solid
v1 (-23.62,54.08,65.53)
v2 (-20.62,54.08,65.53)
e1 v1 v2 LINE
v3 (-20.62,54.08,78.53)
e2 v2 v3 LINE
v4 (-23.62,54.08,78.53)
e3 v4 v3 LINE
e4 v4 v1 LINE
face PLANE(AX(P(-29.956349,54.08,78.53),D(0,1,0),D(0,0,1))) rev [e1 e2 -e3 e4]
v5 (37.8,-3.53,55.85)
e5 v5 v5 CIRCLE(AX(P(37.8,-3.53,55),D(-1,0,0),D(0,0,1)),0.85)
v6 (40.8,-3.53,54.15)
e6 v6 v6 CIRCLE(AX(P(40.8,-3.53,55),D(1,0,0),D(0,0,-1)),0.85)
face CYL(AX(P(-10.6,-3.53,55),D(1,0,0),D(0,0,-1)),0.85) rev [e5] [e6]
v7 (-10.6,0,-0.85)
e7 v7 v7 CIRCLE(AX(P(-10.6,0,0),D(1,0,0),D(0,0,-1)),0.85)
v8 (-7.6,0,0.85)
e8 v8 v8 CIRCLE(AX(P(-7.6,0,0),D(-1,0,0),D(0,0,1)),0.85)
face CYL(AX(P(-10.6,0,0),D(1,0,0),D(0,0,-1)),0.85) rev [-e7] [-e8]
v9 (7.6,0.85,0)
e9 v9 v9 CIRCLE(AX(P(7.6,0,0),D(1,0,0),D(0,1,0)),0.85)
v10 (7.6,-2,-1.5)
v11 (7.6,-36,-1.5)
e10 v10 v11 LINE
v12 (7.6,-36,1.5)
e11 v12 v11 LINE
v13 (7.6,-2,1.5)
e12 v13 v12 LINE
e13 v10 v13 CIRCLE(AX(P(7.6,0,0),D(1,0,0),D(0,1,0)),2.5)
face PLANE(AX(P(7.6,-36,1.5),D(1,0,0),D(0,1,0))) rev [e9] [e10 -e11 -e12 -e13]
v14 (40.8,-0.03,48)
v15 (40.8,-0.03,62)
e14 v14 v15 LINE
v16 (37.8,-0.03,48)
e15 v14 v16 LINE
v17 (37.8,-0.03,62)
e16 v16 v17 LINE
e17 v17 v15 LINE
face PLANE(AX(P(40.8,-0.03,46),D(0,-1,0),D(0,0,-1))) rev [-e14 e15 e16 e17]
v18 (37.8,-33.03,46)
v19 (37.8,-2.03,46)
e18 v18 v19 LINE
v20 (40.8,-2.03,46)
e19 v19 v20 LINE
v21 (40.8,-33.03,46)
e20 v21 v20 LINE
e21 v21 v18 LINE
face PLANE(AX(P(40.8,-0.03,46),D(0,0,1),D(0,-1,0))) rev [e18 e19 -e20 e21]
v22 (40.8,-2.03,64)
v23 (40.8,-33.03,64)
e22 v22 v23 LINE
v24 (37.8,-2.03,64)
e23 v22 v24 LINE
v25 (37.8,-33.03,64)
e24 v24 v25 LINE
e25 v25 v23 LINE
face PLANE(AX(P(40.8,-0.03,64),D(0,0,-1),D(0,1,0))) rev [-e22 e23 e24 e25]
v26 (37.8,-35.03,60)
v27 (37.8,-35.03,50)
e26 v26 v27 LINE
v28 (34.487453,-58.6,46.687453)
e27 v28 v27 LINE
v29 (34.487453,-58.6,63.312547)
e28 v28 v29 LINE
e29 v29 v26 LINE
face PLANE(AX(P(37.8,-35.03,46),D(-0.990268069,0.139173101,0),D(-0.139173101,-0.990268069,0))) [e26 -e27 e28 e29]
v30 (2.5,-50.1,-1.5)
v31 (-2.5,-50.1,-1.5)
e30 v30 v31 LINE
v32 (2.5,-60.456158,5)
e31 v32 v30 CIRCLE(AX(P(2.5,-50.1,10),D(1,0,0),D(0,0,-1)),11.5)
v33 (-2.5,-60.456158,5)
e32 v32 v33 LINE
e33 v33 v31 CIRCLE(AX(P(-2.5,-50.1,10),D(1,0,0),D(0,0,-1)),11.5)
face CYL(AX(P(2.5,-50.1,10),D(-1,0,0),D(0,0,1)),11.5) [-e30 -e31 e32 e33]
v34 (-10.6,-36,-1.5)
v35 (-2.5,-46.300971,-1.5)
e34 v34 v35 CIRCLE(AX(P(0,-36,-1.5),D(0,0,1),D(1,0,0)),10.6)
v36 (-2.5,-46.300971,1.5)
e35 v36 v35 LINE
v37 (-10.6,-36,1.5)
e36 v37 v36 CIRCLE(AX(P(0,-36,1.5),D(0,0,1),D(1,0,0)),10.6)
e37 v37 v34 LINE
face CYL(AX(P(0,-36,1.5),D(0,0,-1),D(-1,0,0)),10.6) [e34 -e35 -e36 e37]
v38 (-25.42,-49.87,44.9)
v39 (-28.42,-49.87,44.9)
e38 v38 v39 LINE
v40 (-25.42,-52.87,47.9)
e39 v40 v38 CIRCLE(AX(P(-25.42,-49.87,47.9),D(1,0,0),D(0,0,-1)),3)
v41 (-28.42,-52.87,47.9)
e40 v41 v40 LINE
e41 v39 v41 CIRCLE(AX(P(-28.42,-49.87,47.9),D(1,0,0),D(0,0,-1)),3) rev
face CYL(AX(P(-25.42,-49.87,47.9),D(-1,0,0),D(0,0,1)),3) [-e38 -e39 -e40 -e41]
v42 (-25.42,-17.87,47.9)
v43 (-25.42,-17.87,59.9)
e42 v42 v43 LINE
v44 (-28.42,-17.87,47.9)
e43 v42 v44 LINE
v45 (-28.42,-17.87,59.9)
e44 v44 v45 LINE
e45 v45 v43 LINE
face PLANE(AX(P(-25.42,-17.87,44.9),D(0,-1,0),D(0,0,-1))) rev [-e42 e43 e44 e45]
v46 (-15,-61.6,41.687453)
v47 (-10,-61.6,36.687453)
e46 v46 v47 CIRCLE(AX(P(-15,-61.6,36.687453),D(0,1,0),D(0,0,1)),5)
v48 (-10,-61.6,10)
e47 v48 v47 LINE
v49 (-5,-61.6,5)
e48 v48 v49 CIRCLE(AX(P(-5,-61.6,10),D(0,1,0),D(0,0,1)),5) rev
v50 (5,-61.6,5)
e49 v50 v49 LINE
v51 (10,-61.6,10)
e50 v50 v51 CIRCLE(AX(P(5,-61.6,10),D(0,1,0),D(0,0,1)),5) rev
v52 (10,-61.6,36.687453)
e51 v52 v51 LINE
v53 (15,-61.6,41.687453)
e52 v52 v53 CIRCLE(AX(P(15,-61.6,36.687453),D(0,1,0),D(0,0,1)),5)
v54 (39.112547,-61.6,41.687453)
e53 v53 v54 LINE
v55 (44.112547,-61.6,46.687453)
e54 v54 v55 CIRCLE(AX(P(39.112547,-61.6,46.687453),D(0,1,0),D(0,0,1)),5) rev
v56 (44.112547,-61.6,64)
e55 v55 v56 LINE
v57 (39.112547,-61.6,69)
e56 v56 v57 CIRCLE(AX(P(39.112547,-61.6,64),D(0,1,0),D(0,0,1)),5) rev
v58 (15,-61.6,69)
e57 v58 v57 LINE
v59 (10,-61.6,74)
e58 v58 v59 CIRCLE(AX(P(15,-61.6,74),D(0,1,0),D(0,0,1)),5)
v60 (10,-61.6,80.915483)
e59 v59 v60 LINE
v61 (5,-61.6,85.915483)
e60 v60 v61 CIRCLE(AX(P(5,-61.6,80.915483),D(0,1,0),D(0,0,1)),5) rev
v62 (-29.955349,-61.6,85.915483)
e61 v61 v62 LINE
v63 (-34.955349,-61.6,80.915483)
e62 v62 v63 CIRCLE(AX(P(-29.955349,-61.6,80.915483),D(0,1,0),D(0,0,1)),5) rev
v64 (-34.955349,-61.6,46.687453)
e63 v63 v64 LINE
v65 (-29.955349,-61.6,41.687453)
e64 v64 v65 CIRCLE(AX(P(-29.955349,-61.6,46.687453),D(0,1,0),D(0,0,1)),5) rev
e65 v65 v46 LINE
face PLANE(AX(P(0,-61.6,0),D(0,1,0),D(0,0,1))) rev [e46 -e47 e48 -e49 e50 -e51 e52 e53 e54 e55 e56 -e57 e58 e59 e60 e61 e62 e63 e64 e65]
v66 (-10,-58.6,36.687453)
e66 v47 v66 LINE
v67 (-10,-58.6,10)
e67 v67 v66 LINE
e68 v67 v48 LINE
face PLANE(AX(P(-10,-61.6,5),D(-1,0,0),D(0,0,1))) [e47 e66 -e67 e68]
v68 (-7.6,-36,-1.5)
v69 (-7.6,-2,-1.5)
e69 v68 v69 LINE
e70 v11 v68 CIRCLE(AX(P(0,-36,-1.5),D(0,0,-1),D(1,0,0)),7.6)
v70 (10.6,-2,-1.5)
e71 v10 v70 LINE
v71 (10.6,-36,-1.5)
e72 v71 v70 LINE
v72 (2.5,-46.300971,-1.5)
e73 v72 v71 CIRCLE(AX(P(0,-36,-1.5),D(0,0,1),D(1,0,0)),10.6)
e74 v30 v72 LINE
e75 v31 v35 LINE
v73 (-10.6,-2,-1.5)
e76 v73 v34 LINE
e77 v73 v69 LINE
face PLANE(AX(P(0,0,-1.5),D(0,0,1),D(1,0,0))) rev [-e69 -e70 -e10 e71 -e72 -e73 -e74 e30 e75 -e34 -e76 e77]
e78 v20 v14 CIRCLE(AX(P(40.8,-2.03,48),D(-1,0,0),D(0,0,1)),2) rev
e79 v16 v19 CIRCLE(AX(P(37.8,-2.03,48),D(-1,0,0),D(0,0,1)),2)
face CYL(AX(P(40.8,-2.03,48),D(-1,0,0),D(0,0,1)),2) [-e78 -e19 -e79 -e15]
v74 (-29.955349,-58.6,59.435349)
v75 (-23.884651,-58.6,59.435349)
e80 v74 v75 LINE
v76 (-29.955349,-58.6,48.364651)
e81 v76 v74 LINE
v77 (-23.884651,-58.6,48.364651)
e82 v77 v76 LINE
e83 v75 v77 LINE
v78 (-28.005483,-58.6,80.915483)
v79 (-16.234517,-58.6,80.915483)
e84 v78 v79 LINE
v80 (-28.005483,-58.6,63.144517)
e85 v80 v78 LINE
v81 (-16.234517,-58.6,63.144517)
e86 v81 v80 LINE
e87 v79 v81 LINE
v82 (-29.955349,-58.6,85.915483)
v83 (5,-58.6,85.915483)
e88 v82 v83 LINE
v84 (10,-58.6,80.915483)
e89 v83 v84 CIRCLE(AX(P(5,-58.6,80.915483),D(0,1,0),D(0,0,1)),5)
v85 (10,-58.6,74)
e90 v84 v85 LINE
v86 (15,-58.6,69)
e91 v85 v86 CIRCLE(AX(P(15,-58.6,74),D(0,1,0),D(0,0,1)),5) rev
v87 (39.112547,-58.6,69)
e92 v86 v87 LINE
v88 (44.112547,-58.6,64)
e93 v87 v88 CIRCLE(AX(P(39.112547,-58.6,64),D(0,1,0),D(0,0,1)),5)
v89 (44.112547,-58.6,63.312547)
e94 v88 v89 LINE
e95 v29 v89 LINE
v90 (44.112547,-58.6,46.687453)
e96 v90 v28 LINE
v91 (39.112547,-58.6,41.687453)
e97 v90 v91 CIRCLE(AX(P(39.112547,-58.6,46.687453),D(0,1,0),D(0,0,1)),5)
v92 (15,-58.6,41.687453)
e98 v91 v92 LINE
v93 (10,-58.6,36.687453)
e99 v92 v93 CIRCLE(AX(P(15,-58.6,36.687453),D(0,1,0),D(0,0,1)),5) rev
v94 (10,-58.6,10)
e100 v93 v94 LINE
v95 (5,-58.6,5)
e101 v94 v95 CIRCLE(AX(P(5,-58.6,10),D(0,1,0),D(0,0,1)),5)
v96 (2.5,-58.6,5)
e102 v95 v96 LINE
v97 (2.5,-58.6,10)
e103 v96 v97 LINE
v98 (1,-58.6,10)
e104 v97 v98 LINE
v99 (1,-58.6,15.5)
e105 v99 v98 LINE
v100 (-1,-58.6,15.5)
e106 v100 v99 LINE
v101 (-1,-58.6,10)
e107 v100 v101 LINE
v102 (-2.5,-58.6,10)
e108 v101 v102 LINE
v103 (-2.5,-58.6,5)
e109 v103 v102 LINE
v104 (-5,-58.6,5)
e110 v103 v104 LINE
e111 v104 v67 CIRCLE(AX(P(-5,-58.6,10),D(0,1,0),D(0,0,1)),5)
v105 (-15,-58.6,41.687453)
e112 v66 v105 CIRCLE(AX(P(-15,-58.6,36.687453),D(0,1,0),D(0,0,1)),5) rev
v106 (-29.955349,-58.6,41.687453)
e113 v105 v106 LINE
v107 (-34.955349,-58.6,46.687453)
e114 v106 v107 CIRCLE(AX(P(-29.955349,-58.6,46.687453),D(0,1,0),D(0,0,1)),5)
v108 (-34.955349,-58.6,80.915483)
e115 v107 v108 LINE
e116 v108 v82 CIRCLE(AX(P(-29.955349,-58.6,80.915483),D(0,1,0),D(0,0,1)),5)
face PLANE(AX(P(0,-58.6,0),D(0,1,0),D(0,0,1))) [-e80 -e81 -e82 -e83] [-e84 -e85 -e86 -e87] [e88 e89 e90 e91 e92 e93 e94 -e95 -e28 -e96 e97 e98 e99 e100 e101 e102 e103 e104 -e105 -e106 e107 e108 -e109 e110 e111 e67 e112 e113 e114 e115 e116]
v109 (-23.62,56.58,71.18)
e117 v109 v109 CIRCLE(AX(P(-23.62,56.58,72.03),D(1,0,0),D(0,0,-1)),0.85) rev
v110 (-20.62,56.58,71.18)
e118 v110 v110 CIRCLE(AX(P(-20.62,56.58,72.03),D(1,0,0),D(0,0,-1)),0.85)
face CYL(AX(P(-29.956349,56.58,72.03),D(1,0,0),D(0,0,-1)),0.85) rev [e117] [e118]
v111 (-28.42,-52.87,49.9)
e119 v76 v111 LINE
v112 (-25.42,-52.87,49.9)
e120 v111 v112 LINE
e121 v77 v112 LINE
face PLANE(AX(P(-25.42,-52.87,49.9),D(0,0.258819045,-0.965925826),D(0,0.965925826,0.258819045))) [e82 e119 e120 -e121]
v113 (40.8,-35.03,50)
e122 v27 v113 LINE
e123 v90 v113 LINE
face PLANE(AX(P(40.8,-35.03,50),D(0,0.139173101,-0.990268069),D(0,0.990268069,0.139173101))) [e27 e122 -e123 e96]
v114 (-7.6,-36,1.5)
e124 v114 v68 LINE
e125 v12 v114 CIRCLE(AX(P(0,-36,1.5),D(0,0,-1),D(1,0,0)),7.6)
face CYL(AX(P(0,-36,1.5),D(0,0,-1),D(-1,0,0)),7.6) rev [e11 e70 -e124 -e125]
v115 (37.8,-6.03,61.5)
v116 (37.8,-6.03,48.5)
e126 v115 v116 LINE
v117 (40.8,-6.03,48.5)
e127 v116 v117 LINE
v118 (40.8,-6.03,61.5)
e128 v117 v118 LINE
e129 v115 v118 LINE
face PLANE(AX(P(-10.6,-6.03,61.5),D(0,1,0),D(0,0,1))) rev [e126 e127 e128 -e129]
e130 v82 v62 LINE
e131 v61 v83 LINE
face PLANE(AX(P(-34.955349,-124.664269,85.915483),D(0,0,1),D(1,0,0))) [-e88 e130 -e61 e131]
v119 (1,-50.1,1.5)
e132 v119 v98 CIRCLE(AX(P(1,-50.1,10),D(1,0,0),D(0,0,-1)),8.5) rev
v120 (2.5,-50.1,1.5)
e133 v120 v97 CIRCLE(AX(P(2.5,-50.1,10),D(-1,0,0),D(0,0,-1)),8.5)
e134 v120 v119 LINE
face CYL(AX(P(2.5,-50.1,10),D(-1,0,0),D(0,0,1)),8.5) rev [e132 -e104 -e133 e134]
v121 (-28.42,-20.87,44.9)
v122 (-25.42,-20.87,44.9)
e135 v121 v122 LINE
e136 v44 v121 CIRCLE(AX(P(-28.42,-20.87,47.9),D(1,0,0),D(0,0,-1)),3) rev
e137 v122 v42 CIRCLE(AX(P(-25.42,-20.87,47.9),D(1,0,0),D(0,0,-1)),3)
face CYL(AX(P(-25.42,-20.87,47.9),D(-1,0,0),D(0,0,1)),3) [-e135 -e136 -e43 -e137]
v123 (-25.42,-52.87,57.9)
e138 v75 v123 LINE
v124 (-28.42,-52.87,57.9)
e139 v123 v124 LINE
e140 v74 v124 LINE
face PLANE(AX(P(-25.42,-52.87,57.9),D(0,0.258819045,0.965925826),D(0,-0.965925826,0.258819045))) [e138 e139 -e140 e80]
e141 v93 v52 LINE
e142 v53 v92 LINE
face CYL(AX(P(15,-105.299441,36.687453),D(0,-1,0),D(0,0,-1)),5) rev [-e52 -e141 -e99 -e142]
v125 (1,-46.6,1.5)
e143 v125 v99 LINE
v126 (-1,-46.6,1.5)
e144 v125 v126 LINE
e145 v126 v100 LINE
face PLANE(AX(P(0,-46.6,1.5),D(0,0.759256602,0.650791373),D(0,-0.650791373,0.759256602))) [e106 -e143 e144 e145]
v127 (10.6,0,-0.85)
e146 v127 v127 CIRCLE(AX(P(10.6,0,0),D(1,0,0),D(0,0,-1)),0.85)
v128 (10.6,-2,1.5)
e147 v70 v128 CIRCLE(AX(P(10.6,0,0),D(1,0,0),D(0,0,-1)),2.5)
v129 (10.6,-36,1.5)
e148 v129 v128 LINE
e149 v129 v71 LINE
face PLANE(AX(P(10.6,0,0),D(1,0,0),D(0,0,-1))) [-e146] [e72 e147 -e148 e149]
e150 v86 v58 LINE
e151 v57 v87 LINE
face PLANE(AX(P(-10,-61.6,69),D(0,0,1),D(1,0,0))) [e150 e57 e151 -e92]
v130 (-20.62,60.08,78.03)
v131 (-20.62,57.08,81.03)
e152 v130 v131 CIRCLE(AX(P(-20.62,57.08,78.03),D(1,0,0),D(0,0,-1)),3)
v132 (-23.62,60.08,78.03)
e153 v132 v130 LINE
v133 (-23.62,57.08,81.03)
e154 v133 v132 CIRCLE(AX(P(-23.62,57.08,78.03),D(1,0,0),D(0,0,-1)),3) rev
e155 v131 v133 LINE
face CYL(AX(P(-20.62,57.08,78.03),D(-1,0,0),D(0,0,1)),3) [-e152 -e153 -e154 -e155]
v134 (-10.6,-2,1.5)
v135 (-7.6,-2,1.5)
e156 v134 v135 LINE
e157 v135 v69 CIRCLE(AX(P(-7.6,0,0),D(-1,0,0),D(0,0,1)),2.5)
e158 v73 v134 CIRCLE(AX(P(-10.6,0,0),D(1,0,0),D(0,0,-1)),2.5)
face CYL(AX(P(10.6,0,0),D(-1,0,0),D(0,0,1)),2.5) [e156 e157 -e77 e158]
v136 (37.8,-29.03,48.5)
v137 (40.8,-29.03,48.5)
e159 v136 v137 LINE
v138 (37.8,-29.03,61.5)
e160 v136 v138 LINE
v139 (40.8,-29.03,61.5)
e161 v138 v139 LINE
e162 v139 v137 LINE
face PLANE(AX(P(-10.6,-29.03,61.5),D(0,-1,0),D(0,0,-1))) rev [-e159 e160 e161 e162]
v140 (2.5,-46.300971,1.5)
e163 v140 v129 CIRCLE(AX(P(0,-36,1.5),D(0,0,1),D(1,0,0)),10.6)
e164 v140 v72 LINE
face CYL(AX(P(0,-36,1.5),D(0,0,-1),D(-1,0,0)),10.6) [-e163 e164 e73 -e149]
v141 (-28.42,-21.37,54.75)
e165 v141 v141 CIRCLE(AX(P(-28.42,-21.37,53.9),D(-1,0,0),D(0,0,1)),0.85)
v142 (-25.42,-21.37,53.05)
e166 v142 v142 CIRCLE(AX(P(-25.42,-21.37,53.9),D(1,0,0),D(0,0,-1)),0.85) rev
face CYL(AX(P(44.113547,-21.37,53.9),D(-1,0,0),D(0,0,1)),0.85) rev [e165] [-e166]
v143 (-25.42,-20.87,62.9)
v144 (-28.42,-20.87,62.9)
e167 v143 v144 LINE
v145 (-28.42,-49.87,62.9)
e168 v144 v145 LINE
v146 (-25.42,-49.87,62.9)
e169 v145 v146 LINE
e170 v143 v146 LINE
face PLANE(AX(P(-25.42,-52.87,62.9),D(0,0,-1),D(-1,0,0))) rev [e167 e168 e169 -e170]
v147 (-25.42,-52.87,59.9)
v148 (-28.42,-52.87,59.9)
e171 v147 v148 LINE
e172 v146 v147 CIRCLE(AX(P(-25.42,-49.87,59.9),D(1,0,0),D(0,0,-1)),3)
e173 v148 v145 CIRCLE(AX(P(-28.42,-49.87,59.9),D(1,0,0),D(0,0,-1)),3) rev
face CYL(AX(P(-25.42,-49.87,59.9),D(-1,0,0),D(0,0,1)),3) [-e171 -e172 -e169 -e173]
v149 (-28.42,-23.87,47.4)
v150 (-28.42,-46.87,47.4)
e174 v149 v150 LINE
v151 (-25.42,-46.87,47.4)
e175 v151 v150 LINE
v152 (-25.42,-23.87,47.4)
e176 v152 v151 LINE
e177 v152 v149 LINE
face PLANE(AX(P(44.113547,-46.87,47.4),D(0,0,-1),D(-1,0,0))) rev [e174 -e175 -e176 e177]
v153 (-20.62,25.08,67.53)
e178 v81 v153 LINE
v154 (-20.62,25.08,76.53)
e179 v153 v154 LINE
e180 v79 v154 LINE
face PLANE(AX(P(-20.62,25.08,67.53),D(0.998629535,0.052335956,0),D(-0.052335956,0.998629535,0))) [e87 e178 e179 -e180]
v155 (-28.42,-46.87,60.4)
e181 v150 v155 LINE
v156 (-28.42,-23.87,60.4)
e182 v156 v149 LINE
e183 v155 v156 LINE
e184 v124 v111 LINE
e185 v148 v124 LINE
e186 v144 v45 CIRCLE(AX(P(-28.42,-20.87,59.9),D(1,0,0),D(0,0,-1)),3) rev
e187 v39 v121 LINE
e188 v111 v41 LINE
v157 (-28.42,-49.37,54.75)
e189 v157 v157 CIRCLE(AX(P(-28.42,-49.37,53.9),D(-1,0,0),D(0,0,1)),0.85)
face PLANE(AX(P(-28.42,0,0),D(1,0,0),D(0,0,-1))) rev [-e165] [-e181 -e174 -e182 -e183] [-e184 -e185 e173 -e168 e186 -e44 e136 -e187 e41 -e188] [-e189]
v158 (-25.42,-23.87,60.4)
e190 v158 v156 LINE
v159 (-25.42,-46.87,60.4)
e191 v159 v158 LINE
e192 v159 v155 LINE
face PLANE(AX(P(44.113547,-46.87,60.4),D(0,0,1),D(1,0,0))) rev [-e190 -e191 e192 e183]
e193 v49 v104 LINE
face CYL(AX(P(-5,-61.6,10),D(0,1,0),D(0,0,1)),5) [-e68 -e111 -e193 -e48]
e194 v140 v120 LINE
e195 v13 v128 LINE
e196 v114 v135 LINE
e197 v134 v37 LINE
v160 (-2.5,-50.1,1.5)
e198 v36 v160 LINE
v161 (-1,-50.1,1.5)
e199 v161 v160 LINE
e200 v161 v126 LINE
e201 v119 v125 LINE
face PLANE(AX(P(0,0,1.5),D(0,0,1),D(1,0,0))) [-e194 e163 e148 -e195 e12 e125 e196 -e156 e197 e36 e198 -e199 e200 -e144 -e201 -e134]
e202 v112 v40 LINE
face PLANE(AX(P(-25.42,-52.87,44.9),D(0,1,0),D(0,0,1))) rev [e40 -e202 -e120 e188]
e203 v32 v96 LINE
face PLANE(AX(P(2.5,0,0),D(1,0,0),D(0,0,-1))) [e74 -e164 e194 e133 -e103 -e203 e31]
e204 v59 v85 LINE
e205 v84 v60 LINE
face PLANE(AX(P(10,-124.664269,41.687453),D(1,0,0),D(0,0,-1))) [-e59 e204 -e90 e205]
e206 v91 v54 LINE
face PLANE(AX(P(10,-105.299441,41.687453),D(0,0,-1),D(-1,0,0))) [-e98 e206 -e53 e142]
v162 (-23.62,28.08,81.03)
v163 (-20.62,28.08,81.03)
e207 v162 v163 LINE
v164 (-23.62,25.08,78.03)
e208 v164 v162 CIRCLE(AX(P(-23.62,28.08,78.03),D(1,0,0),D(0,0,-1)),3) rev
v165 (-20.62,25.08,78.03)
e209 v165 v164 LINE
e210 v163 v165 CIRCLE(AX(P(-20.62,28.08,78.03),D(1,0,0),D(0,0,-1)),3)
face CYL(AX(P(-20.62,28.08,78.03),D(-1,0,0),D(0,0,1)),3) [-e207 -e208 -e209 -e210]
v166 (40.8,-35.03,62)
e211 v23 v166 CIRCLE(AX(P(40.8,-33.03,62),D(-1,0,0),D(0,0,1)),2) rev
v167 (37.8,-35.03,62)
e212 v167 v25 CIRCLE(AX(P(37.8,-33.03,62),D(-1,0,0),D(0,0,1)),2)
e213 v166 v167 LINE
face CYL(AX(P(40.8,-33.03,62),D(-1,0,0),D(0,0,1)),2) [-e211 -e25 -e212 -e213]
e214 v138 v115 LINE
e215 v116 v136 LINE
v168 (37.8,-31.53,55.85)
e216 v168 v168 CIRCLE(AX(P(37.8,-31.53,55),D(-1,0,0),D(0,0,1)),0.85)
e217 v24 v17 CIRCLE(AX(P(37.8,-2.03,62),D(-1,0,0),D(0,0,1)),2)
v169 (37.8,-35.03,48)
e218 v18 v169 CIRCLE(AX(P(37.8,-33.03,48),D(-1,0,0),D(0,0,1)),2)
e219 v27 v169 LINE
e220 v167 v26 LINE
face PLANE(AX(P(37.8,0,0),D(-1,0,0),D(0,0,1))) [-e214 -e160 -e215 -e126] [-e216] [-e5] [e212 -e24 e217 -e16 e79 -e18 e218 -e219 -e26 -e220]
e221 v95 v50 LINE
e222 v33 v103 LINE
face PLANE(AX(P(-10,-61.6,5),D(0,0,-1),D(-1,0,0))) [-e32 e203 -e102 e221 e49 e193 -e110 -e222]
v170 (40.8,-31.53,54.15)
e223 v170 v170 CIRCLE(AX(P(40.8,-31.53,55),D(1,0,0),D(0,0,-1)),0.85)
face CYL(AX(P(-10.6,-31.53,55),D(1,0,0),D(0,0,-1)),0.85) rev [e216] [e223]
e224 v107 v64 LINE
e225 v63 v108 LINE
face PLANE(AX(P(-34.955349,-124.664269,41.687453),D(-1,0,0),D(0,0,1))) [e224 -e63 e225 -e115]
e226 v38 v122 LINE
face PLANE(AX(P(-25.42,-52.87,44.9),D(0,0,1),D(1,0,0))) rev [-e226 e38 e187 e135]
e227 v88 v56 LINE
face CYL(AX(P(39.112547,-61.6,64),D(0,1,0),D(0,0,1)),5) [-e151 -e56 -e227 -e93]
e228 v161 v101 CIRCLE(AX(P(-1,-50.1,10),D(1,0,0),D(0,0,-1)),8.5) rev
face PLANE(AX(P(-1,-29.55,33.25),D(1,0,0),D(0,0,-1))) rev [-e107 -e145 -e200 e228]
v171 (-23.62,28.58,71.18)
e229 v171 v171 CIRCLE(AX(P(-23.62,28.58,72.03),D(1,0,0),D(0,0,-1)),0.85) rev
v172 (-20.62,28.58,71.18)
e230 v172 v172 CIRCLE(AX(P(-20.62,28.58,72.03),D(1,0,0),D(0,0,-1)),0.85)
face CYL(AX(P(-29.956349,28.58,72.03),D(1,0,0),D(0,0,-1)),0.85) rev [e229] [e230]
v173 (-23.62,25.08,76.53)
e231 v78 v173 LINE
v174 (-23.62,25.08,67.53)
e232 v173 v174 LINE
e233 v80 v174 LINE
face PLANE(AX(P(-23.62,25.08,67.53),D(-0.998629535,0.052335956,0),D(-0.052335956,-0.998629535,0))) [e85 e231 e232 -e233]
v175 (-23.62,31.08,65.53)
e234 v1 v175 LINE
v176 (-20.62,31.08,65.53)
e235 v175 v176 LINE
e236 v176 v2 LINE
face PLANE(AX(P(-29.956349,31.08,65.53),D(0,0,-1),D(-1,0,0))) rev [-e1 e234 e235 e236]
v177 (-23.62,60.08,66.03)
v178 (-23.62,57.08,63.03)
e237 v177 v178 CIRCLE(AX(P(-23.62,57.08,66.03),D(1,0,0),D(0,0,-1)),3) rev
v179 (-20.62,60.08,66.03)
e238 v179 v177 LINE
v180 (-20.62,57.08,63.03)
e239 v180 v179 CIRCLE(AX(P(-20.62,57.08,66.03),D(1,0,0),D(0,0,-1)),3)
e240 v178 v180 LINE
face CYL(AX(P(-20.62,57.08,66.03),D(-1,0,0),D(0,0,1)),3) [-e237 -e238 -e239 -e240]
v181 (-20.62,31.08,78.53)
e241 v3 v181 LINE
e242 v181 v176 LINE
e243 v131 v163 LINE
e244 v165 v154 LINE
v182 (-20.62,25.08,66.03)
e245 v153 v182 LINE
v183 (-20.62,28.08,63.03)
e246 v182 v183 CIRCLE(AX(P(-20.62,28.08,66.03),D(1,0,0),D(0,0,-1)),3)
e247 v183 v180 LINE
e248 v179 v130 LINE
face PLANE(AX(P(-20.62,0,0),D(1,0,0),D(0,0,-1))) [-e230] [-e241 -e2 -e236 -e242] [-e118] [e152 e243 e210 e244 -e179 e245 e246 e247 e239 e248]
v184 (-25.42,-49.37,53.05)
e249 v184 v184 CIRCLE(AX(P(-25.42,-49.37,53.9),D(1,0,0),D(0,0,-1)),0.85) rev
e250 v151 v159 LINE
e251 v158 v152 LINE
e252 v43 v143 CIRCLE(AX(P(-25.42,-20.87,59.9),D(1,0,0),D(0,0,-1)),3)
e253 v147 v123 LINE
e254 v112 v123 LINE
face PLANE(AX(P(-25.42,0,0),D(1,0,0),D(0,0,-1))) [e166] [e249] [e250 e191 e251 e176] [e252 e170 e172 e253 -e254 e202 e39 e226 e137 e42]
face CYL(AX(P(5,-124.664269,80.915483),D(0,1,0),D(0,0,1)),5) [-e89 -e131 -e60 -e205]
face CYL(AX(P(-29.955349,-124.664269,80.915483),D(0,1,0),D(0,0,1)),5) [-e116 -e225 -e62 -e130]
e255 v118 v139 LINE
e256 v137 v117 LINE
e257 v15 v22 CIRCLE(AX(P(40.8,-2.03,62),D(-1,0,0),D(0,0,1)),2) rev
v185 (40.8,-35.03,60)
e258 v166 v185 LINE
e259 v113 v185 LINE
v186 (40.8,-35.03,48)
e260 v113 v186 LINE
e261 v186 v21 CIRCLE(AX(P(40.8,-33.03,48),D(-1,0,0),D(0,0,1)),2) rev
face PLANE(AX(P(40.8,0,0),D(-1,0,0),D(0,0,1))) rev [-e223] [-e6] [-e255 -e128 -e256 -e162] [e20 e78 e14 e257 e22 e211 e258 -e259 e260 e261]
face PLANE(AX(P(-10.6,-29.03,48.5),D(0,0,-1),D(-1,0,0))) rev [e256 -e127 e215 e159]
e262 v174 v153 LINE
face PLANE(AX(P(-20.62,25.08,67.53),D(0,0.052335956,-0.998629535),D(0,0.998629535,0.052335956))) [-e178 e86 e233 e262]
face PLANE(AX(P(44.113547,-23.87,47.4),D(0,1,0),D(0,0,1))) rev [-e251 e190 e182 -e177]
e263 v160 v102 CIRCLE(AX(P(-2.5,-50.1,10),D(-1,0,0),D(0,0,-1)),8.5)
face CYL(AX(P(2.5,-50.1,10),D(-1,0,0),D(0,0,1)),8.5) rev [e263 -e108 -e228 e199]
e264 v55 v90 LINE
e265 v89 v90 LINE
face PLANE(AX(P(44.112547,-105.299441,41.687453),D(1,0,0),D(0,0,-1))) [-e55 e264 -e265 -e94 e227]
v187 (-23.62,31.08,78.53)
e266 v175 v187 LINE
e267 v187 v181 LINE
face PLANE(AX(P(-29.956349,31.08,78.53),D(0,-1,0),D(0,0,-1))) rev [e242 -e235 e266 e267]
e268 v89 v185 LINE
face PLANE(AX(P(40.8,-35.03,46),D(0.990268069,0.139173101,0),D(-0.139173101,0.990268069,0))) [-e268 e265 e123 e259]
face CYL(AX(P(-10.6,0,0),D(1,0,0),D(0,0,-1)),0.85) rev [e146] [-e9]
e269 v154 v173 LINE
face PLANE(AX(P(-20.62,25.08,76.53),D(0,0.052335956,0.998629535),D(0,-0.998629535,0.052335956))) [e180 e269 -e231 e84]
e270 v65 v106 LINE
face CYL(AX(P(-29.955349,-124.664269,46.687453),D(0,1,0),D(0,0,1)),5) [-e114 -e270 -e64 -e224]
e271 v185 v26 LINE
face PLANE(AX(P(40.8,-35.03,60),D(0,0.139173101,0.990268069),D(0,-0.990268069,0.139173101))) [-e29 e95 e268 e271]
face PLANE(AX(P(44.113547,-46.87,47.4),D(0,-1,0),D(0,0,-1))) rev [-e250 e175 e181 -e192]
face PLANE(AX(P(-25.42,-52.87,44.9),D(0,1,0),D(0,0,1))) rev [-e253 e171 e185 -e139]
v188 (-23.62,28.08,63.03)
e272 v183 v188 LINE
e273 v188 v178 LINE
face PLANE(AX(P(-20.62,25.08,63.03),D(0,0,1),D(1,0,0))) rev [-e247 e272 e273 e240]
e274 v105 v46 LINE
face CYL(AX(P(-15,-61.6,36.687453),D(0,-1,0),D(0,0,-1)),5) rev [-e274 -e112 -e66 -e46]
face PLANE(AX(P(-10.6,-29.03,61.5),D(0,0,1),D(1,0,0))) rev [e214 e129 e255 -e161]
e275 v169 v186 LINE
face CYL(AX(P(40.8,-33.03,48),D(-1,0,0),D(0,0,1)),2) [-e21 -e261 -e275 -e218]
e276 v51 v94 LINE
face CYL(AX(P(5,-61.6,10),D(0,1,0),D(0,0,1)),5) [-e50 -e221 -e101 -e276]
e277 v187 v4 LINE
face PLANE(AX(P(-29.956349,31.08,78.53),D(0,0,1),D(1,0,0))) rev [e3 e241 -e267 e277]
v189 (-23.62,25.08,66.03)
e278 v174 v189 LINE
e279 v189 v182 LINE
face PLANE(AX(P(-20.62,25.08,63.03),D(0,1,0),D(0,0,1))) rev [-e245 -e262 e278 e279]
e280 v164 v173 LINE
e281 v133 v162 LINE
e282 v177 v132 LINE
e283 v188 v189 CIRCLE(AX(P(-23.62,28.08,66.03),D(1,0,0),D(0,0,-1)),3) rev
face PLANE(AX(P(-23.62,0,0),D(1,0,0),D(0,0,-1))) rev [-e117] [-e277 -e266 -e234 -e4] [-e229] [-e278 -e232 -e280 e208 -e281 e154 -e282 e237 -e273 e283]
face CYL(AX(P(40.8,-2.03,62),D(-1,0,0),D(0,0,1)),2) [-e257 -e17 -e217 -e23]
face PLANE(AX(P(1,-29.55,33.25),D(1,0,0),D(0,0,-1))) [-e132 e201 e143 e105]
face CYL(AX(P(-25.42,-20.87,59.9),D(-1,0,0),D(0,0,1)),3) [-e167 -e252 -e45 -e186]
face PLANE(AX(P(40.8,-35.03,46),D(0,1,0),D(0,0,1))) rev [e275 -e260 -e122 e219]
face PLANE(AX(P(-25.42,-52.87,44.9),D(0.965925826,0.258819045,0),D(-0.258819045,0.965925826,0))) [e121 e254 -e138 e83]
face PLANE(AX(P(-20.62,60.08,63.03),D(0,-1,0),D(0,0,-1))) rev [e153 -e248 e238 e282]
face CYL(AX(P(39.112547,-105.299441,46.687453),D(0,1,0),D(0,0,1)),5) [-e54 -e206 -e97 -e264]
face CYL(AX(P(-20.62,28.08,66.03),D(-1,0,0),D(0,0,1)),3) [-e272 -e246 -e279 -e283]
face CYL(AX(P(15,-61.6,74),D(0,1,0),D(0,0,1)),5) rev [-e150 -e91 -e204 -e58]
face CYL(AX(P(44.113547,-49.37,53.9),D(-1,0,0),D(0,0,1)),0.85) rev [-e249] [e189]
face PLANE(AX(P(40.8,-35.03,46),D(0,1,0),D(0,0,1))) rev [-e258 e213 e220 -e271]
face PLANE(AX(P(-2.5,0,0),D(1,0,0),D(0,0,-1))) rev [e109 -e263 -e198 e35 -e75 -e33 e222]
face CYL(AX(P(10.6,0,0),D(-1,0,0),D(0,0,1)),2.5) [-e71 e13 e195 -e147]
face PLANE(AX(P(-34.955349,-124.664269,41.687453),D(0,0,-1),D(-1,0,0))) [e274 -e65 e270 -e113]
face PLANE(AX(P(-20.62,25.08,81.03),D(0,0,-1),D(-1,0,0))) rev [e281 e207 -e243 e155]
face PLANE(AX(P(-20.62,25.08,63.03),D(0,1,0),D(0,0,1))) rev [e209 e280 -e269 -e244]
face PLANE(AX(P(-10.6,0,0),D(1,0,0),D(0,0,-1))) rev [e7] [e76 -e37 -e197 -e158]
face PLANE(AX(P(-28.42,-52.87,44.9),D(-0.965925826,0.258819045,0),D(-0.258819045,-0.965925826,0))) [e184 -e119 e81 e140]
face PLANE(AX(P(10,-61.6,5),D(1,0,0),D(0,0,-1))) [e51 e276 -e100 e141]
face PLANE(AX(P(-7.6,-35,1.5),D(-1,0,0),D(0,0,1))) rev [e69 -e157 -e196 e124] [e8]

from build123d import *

# Parameters (mm, degrees)
ESBO_O1_R                     = 2.5
RESSALTO_EXTRUS_O1_DEPTH      = 10.6
ESBO_O8_W                     = 21.2
ESBO_O8_H                     = 35
RESSALTO_EXTRUS_O6_DEPTH      = 1.5
RESSALTO_EXTRUS_O2_DEPTH      = 1.5
CORTE_EXTRUS_O1_DEPTH         = 48.855720661
CORTE_EXTRUS_O1_DEPTH_BACK    = 48.855720661
ESBO_O3_W                     = 15.2
ESBO_O3_H                     = 37.5
CORTE_EXTRUS_O2_DEPTH         = 48.855720661
CORTE_EXTRUS_O2_DEPTH_BACK    = 48.855720661
ESBO_O4_R                     = 0.85
ESBO_O5_W                     = 3
ESBO_O5_H                     = 5
RESSALTO_EXTRUS_O3_DEPTH      = 2.5
RESSALTO_EXTRUS_O4_DEPTH      = 2.5
RESSALTO_EXTRUS_O5_START      = -58.6
ESBO_O7_W                     = 20
ESBO_O7_H                     = 64
RESSALTO_EXTRUS_O5_DEPTH      = 3
NERVURA2_REACH                = 95.102
ESBO_O10_WALL_W               = 206.642418638
ESBO_O10_WALL_H               = 2
ESBO_O11_W                    = 18
ESBO_O11_H                    = 35
RESSALTO_EXTRUS_O7_DEPTH      = 3
ESBO_O12_W                    = 13
ESBO_O12_H                    = 23
CORTE_EXTRUS_O3_DEPTH         = 106.818334895
ESBO_O13_R                    = 0.85
CORTE_EXTRUS_O4_DEPTH         = 106.818334895
FILETE1_R                     = 2
RESSALTO_EXTRUS_O11_OUTLINE_W = 9.625094948
RESSALTO_EXTRUS_O11_OUTLINE_H = 16.625094948
RESSALTO_EXTRUS_O11_DEPTH     = 23.57
RESSALTO_EXTRUS_O11_TAPER     = 8
RESSALTO_EXTRUS_O9_START      = -28.42
ESBO_O19_W                    = 18
ESBO_O19_H                    = 35
RESSALTO_EXTRUS_O9_DEPTH      = 3
ESBO_O20_W                    = 13
ESBO_O20_H                    = 23
CORTE_EXTRUS_O6_DEPTH         = 3
ESBO_O21_R                    = 0.85
CORTE_EXTRUS_O7_DEPTH         = 3
FILETE2_R                     = 3
RESSALTO_EXTRUS_O10_OUTLINE_W = 6.070697746
RESSALTO_EXTRUS_O10_OUTLINE_H = 11.070697746
RESSALTO_EXTRUS_O10_DEPTH     = 5.73
RESSALTO_EXTRUS_O10_TAPER     = 15
RESSALTO_EXTRUS_O13_START     = -23.62
ESBO_O28_W                    = 18
ESBO_O28_H                    = 35
RESSALTO_EXTRUS_O13_DEPTH     = 3
ESBO_O29_W                    = 13
ESBO_O29_H                    = 23
CORTE_EXTRUS_O8_DEPTH         = 3
ESBO_O30_R                    = 0.85
CORTE_EXTRUS_O9_DEPTH         = 3
FILETE4_R                     = 3
RESSALTO_EXTRUS_O14_OUTLINE_W = 11.77096594
RESSALTO_EXTRUS_O14_OUTLINE_H = 17.77096594
RESSALTO_EXTRUS_O14_DEPTH     = 83.68
RESSALTO_EXTRUS_O14_DRAFT     = -3
ESBO_O25_W                    = 34.112547474
ESBO_O25_H                    = 27.312547474
RESSALTO_EXTRUS_O12_DEPTH     = 3
ESBO_O32_W                    = 44.955348873
ESBO_O32_H                    = 44.228030444
RESSALTO_EXTRUS_O15_DEPTH     = 3
FILETE3_R                     = 5


# Read off the part's stored shape, not the designer's step: Ressalto-extrusão11, Ressalto-extrusão10, Ressalto-extrusão14
with BuildPart() as part:
    # Esboço1 → Ressalto-extrusão1 (new, symmetric)
    with BuildSketch(Plane(origin=(0, 0, 0), x_dir=(0, 0, -1), z_dir=(1, 0, 0))):
        Circle(ESBO_O1_R)
    extrude(amount=RESSALTO_EXTRUS_O1_DEPTH, both=True)

    # Esboço8 → Ressalto-extrusão6 (add, symmetric)
    with BuildSketch(Plane.XY):
        with Locations((0, -17.5)):
            Rectangle(ESBO_O8_W, ESBO_O8_H)
    extrude(amount=RESSALTO_EXTRUS_O6_DEPTH, both=True)

    # Esboço2 → Ressalto-extrusão2 (add, symmetric)
    with BuildSketch(Plane.XY):
        with BuildLine():
            Line((-10.6, -36), (-10.6, -35))
            Line((-10.6, -35), (-7.6, -35))
            Line((-7.6, -35), (-7.6, -36))
            ThreePointArc((-7.6, -36), (0, -43.6), (7.6, -36))
            Line((7.6, -36), (7.6, -35))
            Line((7.6, -35), (10.6, -35))
            Line((10.6, -35), (10.6, -36))
            ThreePointArc((10.6, -36), (0, -46.6), (-10.6, -36))
        make_face()
    extrude(amount=RESSALTO_EXTRUS_O2_DEPTH, both=True)

    # Esboço3 → Corte-extrusão1 (cut, two sides: drawn at the far end of the back side and taken through both)
    with BuildSketch(Plane.XY.offset(-CORTE_EXTRUS_O1_DEPTH_BACK)):
        with Locations((0, -16.25)):
            Rectangle(ESBO_O3_W, ESBO_O3_H)
    extrude(amount=CORTE_EXTRUS_O1_DEPTH + CORTE_EXTRUS_O1_DEPTH_BACK, mode=Mode.SUBTRACT)

    # Esboço4 → Corte-extrusão2 (cut, two sides: drawn at the far end of the back side and taken through both)
    with BuildSketch(Plane(origin=(0, 0, 0), x_dir=(0, 0, -1), z_dir=(1, 0, 0)).offset(-CORTE_EXTRUS_O2_DEPTH_BACK)):
        Circle(ESBO_O4_R)
    extrude(amount=CORTE_EXTRUS_O2_DEPTH + CORTE_EXTRUS_O2_DEPTH_BACK, mode=Mode.SUBTRACT)

    # Esboço5 → Ressalto-extrusão3 (add, symmetric)
    with BuildSketch(Plane(origin=(0, 0, 0), x_dir=(0, 0, -1), z_dir=(1, 0, 0))):
        with Locations((0, -47.6)):
            Rectangle(ESBO_O5_W, ESBO_O5_H)
    extrude(amount=RESSALTO_EXTRUS_O3_DEPTH, both=True)

    # Esboço6 → Ressalto-extrusão4 (add, symmetric)
    with BuildSketch(Plane(origin=(0, 0, 0), x_dir=(0, 0, -1), z_dir=(1, 0, 0))):
        with BuildLine():
            ThreePointArc((-10, -61.6), (-1.868272016, -58.231727984), (1.5, -50.1))
            ThreePointArc((1.5, -50.1), (0, -48.6), (-1.5, -50.1))
            ThreePointArc((-1.5, -50.1), (-3.98959236, -56.11040764), (-10, -58.6))
            ThreePointArc((-10, -58.6), (-11.5, -60.1), (-10, -61.6))
        make_face()
    extrude(amount=RESSALTO_EXTRUS_O4_DEPTH, both=True)

    # Esboço7 → Ressalto-extrusão5 (add)
    with BuildSketch(Plane(origin=(0, 0, 0), x_dir=(1, 0, 0), z_dir=(0, 1, 0)).offset(RESSALTO_EXTRUS_O5_START)):
        with Locations((0, -37)):
            Rectangle(ESBO_O7_W, ESBO_O7_H)
    extrude(amount=-RESSALTO_EXTRUS_O5_DEPTH)

    # Esboço10 wall → Nervura2 (add, up to next)
    with BuildSketch(Plane(origin=(0, -52.6, 8.5), x_dir=(0, -0.650791373456, 0.759256602365), z_dir=(0, -0.759256602365, -0.650791373456)), mode=Mode.PRIVATE) as nervura2_sk1:
        Rectangle(ESBO_O10_WALL_W, ESBO_O10_WALL_H)
    nervura2_tool1 = extrude(nervura2_sk1.sketch, amount=NERVURA2_REACH, mode=Mode.PRIVATE) - part.part
    add(nervura2_tool1.solids().sort_by_distance((0, -52.6, 8.5))[0])



with BuildPart() as body_2:
    # Esboço11 → Ressalto-extrusão7 (new body)
    with BuildSketch(Plane(origin=(37.8, 0, 0), x_dir=(0, 0, -1), z_dir=(1, 0, 0))):
        with Locations((-55, -17.53)):
            Rectangle(ESBO_O11_W, ESBO_O11_H)
    extrude(amount=RESSALTO_EXTRUS_O7_DEPTH)

    # Esboço12 → Corte-extrusão3 (cut, through all)
    with BuildSketch(Plane(origin=(40.8, 0, 0), x_dir=(0, 0, -1), z_dir=(1, 0, 0))):
        with Locations((-55, -17.53)):
            Rectangle(ESBO_O12_W, ESBO_O12_H)
    extrude(amount=-CORTE_EXTRUS_O3_DEPTH, mode=Mode.SUBTRACT)

    # Esboço13 → Corte-extrusão4 (cut, through all)
    with BuildSketch(Plane(origin=(40.8, 0, 0), x_dir=(0, 0, -1), z_dir=(1, 0, 0))):
        with Locations((-55, -3.53)):
            Circle(ESBO_O13_R)
        with Locations((-55, -31.53)):
            Circle(ESBO_O13_R)
    extrude(amount=-CORTE_EXTRUS_O4_DEPTH, mode=Mode.SUBTRACT)

    # Filete1
    filete1_edges = [body_2.edges().sort_by_distance(p)[0] for p in [
        (39.3, -0.03, 64),
        (39.3, -0.03, 46),
        (39.3, -35.03, 46),
        (39.3, -35.03, 64),
    ]]
    fillet(filete1_edges, radius=FILETE1_R)

    # Ressalto-extrusão11 outline → Ressalto-extrusão11 (add)
    with BuildSketch(Plane(origin=(0, -58.6, 0), x_dir=(1, 0, 0), z_dir=(0, 1, 0))):
        with Locations((39.3, -55)):
            Rectangle(RESSALTO_EXTRUS_O11_OUTLINE_W, RESSALTO_EXTRUS_O11_OUTLINE_H)
    extrude(amount=RESSALTO_EXTRUS_O11_DEPTH, taper=RESSALTO_EXTRUS_O11_TAPER)


with BuildPart() as body_3:
    # Esboço19 → Ressalto-extrusão9 (new body)
    with BuildSketch(Plane(origin=(0, 0, 0), x_dir=(0, 0, -1), z_dir=(1, 0, 0)).offset(RESSALTO_EXTRUS_O9_START)):
        with Locations((-53.9, -35.37)):
            Rectangle(ESBO_O19_W, ESBO_O19_H)
    extrude(amount=RESSALTO_EXTRUS_O9_DEPTH)

    # Esboço20 → Corte-extrusão6 (cut)
    with BuildSketch(Plane.ZY.offset(28.42)):
        with Locations((53.9, -35.37)):
            Rectangle(ESBO_O20_W, ESBO_O20_H)
    extrude(amount=-CORTE_EXTRUS_O6_DEPTH, mode=Mode.SUBTRACT)

    # Esboço21 → Corte-extrusão7 (cut)
    with BuildSketch(Plane.ZY.offset(28.42)):
        with Locations((53.9, -21.37)):
            Circle(ESBO_O21_R)
        with Locations((53.9, -49.37)):
            Circle(ESBO_O21_R)
    extrude(amount=-CORTE_EXTRUS_O7_DEPTH, mode=Mode.SUBTRACT)

    # Filete2
    filete2_edges = [body_3.edges().sort_by_distance(p)[0] for p in [
        (-26.92, -17.87, 62.9),
        (-26.92, -17.87, 44.9),
        (-26.92, -52.87, 44.9),
        (-26.92, -52.87, 62.9),
    ]]
    fillet(filete2_edges, radius=FILETE2_R)

    # Ressalto-extrusão10 outline → Ressalto-extrusão10 (add)
    with BuildSketch(Plane(origin=(0, -58.6, 0), x_dir=(1, 0, 0), z_dir=(0, 1, 0))):
        with Locations((-26.92, -53.9)):
            Rectangle(RESSALTO_EXTRUS_O10_OUTLINE_W, RESSALTO_EXTRUS_O10_OUTLINE_H)
    extrude(amount=RESSALTO_EXTRUS_O10_DEPTH, taper=RESSALTO_EXTRUS_O10_TAPER)


with BuildPart() as body_4:
    # Esboço28 → Ressalto-extrusão13 (new body)
    with BuildSketch(Plane(origin=(0, 0, 0), x_dir=(0, 0, -1), z_dir=(1, 0, 0)).offset(RESSALTO_EXTRUS_O13_START)):
        with Locations((-72.03, 42.58)):
            Rectangle(ESBO_O28_W, ESBO_O28_H)
    extrude(amount=RESSALTO_EXTRUS_O13_DEPTH)

    # Esboço29 → Corte-extrusão8 (cut)
    with BuildSketch(Plane(origin=(-20.62, 0, 0), x_dir=(0, 0, -1), z_dir=(1, 0, 0))):
        with Locations((-72.03, 42.58)):
            Rectangle(ESBO_O29_W, ESBO_O29_H)
    extrude(amount=-CORTE_EXTRUS_O8_DEPTH, mode=Mode.SUBTRACT)

    # Esboço30 → Corte-extrusão9 (cut)
    with BuildSketch(Plane(origin=(-20.62, 0, 0), x_dir=(0, 0, -1), z_dir=(1, 0, 0))):
        with Locations((-72.03, 56.58)):
            Circle(ESBO_O30_R)
        with Locations((-72.03, 28.58)):
            Circle(ESBO_O30_R)
    extrude(amount=-CORTE_EXTRUS_O9_DEPTH, mode=Mode.SUBTRACT)

    # Filete4
    filete4_edges = [body_4.edges().sort_by_distance(p)[0] for p in [
        (-22.12, 60.08, 81.03),
        (-22.12, 60.08, 63.03),
        (-22.12, 25.08, 63.03),
        (-22.12, 25.08, 81.03),
    ]]
    fillet(filete4_edges, radius=FILETE4_R)


with BuildPart() as ressalto_extrus_o14_tool:
    # Ressalto-extrusão14 outline → Ressalto-extrusão14 (with draft: the straight prism first)
    with BuildSketch(Plane.XZ.offset(58.6)):
        with Locations((-22.12, 72.03)):
            Rectangle(RESSALTO_EXTRUS_O14_OUTLINE_W, RESSALTO_EXTRUS_O14_OUTLINE_H)
    extrude(amount=-RESSALTO_EXTRUS_O14_DEPTH)
    # Ressalto-extrusão14: the draft: its side faces are tilted about the plane it starts from
    ressalto_extrus_o14_sides = [ressalto_extrus_o14_tool.faces().sort_by_distance(p)[0] for p in [
        (-22.12, -16.76, 80.91548297),
        (-28.00548297, -16.76, 72.03),
        (-22.12, -16.76, 63.14451703),
        (-16.23451703, -16.76, 72.03),
    ]]
    draft(ressalto_extrus_o14_sides, Plane.XZ.offset(58.6), RESSALTO_EXTRUS_O14_DRAFT)


with BuildPart() as body_4_1:
    add(body_4.part)

    # Ressalto-extrusão14: add ressalto_extrus_o14_tool
    add(ressalto_extrus_o14_tool.part)


with BuildPart() as part_1:
    add(part.part)

    add(body_2.part)  # Ressalto-extrusão12 merges body 2
    # Esboço25 → Ressalto-extrusão12 (add)
    with BuildSketch(Plane(origin=(0, -58.6, 0), x_dir=(1, 0, 0), z_dir=(0, 1, 0))):
        with Locations((27.056273737, -55.343726263)):
            Rectangle(ESBO_O25_W, ESBO_O25_H)
    extrude(amount=-RESSALTO_EXTRUS_O12_DEPTH)


    add(body_3.part)  # Ressalto-extrusão15 merges body 3

    add(body_4_1.part)  # Ressalto-extrusão15 merges body 4
    # Esboço32 → Ressalto-extrusão15 (add)
    with BuildSketch(Plane(origin=(0, -58.6, 0), x_dir=(1, 0, 0), z_dir=(0, 1, 0))):
        with Locations((-12.477674437, -63.801467748)):
            Rectangle(ESBO_O32_W, ESBO_O32_H)
    extrude(amount=-RESSALTO_EXTRUS_O15_DEPTH)

    # Filete3
    filete3_edges = [part_1.edges().sort_by_distance(p)[0] for p in [
        (-34.955348873, -60.1, 85.91548297),
        (-34.955348873, -60.1, 41.687452526),
        (10, -60.1, 85.91548297),
        (-10, -60.1, 41.687452526),
        (-10, -60.1, 5),
        (10, -60.1, 5),
        (10, -60.1, 69),
        (44.112547474, -60.1, 69),
        (10, -60.1, 41.687452526),
        (44.112547474, -60.1, 41.687452526),
    ]]
    fillet(filete3_edges, radius=FILETE3_R)


solid = part_1.part
